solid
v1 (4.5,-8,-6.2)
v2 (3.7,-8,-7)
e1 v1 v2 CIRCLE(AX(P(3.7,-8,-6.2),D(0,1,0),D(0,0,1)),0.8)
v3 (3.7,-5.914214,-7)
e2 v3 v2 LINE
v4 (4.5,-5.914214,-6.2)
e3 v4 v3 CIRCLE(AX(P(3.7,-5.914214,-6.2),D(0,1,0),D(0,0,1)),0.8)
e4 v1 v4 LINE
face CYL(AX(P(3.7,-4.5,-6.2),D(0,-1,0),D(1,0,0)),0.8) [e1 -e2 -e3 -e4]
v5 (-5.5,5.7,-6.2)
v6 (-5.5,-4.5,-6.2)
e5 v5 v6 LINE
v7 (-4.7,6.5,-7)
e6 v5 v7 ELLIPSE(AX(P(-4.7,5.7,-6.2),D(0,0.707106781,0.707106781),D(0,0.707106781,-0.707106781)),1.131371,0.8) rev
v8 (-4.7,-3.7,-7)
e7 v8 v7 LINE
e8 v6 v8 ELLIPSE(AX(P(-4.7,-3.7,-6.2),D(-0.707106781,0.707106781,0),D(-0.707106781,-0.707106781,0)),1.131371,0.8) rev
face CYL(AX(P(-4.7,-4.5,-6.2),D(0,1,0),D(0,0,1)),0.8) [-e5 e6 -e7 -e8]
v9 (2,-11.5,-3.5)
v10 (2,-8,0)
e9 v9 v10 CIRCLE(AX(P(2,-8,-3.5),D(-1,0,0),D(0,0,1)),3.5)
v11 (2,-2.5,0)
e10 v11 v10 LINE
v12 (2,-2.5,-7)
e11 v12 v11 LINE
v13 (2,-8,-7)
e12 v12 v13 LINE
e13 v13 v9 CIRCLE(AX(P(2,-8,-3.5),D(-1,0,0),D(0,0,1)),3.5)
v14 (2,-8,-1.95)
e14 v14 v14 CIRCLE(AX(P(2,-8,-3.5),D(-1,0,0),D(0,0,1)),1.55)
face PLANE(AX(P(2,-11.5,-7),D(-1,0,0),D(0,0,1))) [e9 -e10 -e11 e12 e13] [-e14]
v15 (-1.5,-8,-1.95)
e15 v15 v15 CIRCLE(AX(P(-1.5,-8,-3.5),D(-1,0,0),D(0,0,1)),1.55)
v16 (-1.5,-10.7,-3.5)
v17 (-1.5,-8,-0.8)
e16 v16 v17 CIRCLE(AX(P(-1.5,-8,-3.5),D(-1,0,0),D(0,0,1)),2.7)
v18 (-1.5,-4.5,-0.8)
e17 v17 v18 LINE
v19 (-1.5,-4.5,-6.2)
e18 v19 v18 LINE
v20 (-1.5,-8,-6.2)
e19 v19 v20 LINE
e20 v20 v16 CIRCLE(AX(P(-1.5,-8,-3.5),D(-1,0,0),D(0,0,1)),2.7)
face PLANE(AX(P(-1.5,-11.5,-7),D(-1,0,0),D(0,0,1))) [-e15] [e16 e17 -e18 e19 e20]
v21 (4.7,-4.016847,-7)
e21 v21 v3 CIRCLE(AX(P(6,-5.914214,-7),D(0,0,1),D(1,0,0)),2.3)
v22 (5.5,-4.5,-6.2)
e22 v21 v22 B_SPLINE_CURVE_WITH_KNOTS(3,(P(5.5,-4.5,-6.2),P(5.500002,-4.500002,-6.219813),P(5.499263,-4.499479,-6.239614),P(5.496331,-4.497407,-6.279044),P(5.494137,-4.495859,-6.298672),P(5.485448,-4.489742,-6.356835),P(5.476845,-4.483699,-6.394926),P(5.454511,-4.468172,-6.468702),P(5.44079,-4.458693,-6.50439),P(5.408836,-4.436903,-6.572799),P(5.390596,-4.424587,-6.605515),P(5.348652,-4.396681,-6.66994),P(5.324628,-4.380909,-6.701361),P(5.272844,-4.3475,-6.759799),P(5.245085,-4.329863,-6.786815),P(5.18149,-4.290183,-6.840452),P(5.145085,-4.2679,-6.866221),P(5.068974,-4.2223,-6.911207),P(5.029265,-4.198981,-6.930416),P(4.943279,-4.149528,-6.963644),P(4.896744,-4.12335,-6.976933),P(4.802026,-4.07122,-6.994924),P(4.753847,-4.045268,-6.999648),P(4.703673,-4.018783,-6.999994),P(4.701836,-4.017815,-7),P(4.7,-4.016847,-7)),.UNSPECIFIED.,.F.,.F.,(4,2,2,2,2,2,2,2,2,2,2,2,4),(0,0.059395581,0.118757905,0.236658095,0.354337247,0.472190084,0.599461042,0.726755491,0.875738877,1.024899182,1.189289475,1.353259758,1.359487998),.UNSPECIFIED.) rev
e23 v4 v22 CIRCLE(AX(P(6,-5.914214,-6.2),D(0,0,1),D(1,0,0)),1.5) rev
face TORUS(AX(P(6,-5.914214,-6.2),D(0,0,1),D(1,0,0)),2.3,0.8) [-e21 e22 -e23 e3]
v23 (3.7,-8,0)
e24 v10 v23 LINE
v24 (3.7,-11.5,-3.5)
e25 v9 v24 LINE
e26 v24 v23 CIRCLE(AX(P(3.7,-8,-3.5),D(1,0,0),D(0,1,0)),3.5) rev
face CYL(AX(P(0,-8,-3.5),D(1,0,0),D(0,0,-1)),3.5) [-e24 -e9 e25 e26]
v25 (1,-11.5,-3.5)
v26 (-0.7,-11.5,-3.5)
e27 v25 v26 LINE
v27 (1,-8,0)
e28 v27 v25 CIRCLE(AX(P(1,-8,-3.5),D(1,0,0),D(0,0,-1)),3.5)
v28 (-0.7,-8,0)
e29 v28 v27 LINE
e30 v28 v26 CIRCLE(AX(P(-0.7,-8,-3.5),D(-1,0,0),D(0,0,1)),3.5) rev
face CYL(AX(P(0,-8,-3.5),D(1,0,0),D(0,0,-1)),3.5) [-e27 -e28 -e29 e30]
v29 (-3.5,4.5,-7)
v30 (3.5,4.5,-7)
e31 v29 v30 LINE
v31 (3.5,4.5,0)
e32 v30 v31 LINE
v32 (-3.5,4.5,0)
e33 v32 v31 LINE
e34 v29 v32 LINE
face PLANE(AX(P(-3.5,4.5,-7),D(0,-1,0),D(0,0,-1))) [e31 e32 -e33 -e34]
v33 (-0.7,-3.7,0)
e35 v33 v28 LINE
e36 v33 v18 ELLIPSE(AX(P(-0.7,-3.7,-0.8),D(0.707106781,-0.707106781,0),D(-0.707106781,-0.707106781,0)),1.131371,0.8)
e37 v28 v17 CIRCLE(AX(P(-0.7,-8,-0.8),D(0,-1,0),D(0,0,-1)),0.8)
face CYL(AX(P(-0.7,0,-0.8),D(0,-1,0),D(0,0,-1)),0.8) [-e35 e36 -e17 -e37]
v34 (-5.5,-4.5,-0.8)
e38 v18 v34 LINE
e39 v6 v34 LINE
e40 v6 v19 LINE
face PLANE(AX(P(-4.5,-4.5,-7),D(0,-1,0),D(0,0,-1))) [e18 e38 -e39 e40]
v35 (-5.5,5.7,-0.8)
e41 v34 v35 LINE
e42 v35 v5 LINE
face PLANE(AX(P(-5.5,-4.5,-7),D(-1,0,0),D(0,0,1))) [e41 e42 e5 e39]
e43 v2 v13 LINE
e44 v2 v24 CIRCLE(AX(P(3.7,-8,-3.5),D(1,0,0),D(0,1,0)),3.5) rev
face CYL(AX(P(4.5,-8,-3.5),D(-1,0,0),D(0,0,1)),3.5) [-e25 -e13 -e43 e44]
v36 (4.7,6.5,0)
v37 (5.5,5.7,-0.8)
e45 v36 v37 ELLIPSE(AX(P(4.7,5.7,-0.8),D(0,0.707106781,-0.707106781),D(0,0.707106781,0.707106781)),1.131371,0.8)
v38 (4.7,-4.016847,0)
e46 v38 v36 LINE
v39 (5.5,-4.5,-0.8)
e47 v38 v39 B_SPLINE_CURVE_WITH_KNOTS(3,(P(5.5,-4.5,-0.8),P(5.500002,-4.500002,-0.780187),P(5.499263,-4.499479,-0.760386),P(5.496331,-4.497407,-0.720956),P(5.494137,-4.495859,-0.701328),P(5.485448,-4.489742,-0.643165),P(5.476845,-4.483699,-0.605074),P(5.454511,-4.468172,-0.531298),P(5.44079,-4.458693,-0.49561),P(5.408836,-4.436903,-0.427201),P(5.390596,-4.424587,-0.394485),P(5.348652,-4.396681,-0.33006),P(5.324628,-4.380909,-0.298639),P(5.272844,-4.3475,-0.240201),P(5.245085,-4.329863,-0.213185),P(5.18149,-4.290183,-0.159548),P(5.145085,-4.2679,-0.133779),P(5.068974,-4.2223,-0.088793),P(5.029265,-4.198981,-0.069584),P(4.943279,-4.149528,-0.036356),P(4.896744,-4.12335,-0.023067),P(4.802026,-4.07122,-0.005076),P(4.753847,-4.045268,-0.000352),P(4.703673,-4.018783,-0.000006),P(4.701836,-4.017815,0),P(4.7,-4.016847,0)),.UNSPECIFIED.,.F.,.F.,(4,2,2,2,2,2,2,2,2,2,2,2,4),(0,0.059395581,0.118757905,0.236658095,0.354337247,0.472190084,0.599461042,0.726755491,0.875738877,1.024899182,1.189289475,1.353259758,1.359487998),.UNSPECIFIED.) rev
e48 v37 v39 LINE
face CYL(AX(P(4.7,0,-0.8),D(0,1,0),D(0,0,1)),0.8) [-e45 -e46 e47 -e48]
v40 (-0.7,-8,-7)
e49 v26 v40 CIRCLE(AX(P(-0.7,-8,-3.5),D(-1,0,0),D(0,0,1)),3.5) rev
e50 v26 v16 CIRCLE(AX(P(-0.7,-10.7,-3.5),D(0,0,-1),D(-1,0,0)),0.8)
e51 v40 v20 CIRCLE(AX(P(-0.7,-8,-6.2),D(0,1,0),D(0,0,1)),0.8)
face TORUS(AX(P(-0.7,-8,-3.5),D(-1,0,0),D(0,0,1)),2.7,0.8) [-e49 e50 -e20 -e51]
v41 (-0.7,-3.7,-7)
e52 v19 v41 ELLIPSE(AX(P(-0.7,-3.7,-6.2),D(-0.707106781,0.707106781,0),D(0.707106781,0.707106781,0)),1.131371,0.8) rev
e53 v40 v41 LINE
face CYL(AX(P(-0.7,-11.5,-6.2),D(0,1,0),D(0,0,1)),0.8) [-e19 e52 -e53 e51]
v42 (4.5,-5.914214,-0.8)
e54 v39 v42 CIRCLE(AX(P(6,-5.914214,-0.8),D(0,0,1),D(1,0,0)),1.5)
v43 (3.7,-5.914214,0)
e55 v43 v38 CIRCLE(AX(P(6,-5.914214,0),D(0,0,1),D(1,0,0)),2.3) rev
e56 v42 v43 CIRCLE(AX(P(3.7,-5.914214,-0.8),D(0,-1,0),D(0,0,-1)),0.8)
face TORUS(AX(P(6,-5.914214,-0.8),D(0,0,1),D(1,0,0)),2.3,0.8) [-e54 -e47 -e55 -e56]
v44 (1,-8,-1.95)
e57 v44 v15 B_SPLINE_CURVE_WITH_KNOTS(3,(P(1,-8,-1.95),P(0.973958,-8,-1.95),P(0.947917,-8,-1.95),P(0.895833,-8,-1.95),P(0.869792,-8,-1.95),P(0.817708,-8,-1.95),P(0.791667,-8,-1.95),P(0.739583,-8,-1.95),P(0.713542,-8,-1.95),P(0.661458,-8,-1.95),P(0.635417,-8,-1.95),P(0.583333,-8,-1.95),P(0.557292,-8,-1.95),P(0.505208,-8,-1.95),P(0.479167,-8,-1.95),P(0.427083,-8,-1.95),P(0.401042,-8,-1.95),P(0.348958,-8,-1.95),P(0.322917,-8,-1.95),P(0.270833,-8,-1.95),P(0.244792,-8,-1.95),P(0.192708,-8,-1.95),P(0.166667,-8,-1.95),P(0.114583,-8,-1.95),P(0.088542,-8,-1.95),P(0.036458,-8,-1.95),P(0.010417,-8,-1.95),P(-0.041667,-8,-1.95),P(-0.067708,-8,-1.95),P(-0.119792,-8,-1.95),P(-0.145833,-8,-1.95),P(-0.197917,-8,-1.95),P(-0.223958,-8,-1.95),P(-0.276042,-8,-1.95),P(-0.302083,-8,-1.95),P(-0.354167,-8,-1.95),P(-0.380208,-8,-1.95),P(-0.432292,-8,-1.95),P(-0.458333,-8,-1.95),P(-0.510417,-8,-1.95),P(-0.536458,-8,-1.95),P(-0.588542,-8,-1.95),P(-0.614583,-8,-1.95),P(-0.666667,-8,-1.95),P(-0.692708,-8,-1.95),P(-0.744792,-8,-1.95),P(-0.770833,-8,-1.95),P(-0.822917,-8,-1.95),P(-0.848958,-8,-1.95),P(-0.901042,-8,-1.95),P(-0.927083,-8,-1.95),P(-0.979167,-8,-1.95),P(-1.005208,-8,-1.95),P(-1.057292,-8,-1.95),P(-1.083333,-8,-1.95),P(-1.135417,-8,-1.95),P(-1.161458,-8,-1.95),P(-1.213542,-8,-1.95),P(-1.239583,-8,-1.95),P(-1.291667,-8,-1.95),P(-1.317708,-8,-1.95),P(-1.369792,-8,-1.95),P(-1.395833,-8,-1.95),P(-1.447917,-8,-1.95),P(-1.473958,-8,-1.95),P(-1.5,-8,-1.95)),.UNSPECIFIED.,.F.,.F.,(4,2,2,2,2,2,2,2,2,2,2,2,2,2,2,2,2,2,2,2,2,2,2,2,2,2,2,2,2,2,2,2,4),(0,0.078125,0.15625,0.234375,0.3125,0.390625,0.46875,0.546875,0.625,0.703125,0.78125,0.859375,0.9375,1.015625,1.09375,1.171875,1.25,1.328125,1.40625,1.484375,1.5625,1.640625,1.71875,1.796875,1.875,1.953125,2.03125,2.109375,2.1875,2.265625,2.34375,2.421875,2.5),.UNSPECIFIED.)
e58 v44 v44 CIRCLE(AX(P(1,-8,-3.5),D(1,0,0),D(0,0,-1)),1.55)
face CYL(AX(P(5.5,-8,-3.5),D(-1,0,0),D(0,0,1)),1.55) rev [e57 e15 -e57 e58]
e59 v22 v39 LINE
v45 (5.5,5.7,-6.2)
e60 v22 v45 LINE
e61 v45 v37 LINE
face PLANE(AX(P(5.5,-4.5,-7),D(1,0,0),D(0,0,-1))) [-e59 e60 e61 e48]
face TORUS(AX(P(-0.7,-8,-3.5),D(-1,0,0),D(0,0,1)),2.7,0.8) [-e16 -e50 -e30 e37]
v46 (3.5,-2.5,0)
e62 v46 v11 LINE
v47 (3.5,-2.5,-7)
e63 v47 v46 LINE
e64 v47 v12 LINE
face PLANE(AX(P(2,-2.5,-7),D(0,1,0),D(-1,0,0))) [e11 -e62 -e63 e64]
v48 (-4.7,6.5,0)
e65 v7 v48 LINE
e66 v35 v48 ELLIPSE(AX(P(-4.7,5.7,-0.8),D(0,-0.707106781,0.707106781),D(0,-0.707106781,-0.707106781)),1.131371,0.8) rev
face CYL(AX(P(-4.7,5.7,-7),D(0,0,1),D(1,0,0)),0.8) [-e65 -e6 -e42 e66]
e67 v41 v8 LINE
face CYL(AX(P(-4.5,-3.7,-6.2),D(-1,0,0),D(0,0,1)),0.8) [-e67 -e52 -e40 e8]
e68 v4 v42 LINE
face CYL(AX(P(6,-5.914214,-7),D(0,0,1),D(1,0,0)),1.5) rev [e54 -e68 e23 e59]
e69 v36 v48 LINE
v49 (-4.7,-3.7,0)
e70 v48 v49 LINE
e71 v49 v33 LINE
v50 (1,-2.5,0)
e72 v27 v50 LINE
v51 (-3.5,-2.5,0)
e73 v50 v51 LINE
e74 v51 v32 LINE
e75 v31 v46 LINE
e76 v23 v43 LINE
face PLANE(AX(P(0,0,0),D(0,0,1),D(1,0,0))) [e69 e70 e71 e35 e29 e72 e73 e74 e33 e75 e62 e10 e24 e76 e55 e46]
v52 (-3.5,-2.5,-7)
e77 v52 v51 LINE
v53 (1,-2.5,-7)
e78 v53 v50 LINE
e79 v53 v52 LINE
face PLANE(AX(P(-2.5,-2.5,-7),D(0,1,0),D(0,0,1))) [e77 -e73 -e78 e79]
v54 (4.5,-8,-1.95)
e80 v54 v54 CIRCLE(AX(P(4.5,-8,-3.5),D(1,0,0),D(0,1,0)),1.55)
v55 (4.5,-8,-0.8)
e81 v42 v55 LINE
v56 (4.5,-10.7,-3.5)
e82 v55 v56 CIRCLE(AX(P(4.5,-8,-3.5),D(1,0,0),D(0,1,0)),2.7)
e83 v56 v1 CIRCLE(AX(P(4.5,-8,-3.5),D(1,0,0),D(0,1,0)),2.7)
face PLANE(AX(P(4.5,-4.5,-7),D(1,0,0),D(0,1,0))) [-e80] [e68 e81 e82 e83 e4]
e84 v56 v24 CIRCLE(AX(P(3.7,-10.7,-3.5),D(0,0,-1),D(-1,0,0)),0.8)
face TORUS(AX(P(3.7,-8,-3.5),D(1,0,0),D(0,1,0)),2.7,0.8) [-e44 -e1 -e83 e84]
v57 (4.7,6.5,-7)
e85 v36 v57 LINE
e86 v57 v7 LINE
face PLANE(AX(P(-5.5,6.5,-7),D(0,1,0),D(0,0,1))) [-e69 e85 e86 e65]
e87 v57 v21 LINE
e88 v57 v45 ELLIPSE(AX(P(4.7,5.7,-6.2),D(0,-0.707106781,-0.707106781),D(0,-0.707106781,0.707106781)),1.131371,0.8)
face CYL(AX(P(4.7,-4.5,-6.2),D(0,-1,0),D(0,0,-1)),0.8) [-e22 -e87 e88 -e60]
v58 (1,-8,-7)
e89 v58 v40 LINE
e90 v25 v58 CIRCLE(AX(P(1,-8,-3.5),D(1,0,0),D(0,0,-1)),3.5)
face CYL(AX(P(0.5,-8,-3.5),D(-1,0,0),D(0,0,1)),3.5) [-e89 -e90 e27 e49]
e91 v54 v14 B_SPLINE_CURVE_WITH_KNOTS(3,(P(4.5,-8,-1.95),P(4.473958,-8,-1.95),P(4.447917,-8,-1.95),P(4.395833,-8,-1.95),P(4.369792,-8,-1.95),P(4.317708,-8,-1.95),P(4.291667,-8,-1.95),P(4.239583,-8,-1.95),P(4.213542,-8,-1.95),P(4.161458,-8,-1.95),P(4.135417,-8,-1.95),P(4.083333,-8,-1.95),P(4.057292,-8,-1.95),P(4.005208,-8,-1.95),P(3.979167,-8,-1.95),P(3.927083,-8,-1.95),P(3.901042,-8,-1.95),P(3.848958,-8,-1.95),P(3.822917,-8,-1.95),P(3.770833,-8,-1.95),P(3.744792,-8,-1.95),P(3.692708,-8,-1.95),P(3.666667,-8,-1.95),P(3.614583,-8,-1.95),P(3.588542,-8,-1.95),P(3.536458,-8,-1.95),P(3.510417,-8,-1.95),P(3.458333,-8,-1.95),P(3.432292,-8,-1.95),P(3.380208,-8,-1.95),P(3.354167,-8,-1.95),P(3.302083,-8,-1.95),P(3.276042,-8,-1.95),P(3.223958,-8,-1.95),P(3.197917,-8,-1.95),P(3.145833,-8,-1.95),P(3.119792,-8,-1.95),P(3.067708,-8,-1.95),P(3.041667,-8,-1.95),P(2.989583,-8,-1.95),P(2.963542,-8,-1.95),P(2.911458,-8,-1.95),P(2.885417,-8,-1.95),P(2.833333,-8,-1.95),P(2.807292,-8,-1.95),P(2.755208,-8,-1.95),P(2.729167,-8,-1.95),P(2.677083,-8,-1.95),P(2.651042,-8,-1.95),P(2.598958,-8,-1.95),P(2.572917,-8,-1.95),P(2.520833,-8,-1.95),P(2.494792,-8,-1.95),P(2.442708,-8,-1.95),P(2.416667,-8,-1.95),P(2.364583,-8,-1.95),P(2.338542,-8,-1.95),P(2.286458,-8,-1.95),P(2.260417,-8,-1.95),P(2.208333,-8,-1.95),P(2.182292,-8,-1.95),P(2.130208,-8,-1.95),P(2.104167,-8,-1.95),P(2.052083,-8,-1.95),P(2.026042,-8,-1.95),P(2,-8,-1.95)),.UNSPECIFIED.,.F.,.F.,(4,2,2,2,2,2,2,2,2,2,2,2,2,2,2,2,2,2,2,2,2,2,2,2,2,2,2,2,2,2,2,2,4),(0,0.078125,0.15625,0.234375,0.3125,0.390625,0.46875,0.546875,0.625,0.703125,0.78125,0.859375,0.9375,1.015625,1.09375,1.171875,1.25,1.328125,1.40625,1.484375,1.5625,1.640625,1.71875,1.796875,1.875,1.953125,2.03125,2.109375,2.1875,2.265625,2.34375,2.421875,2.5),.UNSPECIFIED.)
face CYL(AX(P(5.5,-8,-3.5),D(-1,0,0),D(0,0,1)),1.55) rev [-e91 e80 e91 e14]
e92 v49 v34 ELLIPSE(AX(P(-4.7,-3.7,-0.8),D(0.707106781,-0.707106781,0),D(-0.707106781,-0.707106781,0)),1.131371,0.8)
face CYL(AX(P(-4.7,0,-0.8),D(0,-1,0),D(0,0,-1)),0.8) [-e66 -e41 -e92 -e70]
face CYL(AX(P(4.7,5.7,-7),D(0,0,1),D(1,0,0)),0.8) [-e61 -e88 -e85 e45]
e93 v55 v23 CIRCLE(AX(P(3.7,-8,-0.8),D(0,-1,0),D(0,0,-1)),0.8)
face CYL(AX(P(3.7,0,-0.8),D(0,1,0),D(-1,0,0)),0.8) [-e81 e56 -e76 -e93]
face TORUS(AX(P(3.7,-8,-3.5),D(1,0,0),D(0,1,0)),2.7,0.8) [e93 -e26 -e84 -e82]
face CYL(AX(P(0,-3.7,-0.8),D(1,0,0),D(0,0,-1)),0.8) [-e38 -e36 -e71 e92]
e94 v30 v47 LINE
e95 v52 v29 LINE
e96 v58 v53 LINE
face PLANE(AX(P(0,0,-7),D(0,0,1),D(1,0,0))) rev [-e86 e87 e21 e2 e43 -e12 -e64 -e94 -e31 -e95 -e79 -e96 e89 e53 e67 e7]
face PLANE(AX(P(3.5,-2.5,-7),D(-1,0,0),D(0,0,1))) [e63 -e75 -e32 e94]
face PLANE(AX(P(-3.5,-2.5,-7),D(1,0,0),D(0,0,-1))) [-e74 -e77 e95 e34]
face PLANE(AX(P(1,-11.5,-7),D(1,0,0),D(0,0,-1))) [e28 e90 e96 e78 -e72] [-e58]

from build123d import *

# Parameters (mm, degrees)
EXTRUDE_1_DEPTH     = 7
FILLET_1_R          = 3.5
SKETCH_2_R          = 1.55
CUT_EXTRUDE_1_DEPTH = 16.173990905
FILLET_2_R          = 1.5
FILLET_3_R          = 0.8


# Some blends are built 0.0001 mm under size
with BuildPart() as part:
    # 草图1 → 凸台-拉伸1 (new body)
    with BuildSketch(Plane.XY):
        Polygon((2, -2.5), (2.5, -2.5), (3.5, -2.5), (3.5, 4.5), (-3.5, 4.5), (-3.5, -2.5), (-2.5, -2.5), (1, -2.5), (1, -11.5), (0.5, -11.5), (-1.5, -11.5), (-1.5, -4.5), (-4.5, -4.5), (-5.5, -4.5), (-5.5, 6.5), (5.5, 6.5), (5.5, -4.5), (4.5, -4.5), (4.5, -11.5), (2.5, -11.5), (2, -11.5), align=None)
    extrude(amount=-EXTRUDE_1_DEPTH)

    # 圆角1
    fillet_1_edges = [part.edges().sort_by_distance(p)[0] for p in [
        (3.25, -11.5, 0),
        (3.25, -11.5, -7),
        (-0.25, -11.5, -7),
        (-0.25, -11.5, 0),
    ]]
    fillet(fillet_1_edges, radius=FILLET_1_R - 0.0001)  # a hair under: the kernel refuses the full size

    # 草图2 → 切除-拉伸1 (cut, through all)
    with BuildSketch(Plane.ZY.offset(1.5)):
        with Locations((-3.5, -8)):
            Circle(SKETCH_2_R)
    extrude(amount=-CUT_EXTRUDE_1_DEPTH, mode=Mode.SUBTRACT)

    # 圆角2
    # the kernel refuses this fillet: 1.5 mm, written as the material it adds along each edge
    with BuildSketch(Plane(origin=(4.5, -4.5, 0), x_dir=(1, 0, 0), z_dir=(0, 0, -1))) as fillet_2_piece_1:
        with BuildLine():
            CenterArc((1.5, 1.414213562), FILLET_2_R, 180, 70.528779366)
            Line((0, 1.414213562), (-0.03, 1.414213562))
            Line((-0.03, 1.414213562), (-0.03, 0))
            Line((-0.03, 0), (0, -0.03))
            ThreePointArc((0, -0.03), (0.5, -0.03), (0.99, -0.028284271))
            Line((0.99, -0.028284271), (1, 0))
        make_face()
    extrude(amount=7)

    # 圆角3
    fillet_3_edges = [part.edges().sort_by_distance(p)[0] for p in [
        (-1.5, -6.25005, 0),
        (-3.5, -4.5, 0),
        (-5.5, 1, 0),
        (5.5, 1, 0),
        (5.5, 1, -7),
        (-5.5, 1, -7),
        (-3.5, -4.5, -7),
        (-5.5, 6.5, -3.5),
        (5.5, 6.5, -3.5),
        (-1.5, -6.25005, -7),
        (4.5, -6.957156781, 0),
        (4.5, -6.957156781, -7),
        (4.5, -10.474903023, -5.974903023),
        (4.5, -10.474903023, -1.025096977),
        (-1.5, -10.474903023, -1.025096977),
        (-1.5, -10.474903023, -5.974903023),
        (4.775255129, -5.048188159, 0),
        (4.775255129, -5.048188159, -7),
    ]]
    fillet(fillet_3_edges, radius=FILLET_3_R)


solid = part.part
